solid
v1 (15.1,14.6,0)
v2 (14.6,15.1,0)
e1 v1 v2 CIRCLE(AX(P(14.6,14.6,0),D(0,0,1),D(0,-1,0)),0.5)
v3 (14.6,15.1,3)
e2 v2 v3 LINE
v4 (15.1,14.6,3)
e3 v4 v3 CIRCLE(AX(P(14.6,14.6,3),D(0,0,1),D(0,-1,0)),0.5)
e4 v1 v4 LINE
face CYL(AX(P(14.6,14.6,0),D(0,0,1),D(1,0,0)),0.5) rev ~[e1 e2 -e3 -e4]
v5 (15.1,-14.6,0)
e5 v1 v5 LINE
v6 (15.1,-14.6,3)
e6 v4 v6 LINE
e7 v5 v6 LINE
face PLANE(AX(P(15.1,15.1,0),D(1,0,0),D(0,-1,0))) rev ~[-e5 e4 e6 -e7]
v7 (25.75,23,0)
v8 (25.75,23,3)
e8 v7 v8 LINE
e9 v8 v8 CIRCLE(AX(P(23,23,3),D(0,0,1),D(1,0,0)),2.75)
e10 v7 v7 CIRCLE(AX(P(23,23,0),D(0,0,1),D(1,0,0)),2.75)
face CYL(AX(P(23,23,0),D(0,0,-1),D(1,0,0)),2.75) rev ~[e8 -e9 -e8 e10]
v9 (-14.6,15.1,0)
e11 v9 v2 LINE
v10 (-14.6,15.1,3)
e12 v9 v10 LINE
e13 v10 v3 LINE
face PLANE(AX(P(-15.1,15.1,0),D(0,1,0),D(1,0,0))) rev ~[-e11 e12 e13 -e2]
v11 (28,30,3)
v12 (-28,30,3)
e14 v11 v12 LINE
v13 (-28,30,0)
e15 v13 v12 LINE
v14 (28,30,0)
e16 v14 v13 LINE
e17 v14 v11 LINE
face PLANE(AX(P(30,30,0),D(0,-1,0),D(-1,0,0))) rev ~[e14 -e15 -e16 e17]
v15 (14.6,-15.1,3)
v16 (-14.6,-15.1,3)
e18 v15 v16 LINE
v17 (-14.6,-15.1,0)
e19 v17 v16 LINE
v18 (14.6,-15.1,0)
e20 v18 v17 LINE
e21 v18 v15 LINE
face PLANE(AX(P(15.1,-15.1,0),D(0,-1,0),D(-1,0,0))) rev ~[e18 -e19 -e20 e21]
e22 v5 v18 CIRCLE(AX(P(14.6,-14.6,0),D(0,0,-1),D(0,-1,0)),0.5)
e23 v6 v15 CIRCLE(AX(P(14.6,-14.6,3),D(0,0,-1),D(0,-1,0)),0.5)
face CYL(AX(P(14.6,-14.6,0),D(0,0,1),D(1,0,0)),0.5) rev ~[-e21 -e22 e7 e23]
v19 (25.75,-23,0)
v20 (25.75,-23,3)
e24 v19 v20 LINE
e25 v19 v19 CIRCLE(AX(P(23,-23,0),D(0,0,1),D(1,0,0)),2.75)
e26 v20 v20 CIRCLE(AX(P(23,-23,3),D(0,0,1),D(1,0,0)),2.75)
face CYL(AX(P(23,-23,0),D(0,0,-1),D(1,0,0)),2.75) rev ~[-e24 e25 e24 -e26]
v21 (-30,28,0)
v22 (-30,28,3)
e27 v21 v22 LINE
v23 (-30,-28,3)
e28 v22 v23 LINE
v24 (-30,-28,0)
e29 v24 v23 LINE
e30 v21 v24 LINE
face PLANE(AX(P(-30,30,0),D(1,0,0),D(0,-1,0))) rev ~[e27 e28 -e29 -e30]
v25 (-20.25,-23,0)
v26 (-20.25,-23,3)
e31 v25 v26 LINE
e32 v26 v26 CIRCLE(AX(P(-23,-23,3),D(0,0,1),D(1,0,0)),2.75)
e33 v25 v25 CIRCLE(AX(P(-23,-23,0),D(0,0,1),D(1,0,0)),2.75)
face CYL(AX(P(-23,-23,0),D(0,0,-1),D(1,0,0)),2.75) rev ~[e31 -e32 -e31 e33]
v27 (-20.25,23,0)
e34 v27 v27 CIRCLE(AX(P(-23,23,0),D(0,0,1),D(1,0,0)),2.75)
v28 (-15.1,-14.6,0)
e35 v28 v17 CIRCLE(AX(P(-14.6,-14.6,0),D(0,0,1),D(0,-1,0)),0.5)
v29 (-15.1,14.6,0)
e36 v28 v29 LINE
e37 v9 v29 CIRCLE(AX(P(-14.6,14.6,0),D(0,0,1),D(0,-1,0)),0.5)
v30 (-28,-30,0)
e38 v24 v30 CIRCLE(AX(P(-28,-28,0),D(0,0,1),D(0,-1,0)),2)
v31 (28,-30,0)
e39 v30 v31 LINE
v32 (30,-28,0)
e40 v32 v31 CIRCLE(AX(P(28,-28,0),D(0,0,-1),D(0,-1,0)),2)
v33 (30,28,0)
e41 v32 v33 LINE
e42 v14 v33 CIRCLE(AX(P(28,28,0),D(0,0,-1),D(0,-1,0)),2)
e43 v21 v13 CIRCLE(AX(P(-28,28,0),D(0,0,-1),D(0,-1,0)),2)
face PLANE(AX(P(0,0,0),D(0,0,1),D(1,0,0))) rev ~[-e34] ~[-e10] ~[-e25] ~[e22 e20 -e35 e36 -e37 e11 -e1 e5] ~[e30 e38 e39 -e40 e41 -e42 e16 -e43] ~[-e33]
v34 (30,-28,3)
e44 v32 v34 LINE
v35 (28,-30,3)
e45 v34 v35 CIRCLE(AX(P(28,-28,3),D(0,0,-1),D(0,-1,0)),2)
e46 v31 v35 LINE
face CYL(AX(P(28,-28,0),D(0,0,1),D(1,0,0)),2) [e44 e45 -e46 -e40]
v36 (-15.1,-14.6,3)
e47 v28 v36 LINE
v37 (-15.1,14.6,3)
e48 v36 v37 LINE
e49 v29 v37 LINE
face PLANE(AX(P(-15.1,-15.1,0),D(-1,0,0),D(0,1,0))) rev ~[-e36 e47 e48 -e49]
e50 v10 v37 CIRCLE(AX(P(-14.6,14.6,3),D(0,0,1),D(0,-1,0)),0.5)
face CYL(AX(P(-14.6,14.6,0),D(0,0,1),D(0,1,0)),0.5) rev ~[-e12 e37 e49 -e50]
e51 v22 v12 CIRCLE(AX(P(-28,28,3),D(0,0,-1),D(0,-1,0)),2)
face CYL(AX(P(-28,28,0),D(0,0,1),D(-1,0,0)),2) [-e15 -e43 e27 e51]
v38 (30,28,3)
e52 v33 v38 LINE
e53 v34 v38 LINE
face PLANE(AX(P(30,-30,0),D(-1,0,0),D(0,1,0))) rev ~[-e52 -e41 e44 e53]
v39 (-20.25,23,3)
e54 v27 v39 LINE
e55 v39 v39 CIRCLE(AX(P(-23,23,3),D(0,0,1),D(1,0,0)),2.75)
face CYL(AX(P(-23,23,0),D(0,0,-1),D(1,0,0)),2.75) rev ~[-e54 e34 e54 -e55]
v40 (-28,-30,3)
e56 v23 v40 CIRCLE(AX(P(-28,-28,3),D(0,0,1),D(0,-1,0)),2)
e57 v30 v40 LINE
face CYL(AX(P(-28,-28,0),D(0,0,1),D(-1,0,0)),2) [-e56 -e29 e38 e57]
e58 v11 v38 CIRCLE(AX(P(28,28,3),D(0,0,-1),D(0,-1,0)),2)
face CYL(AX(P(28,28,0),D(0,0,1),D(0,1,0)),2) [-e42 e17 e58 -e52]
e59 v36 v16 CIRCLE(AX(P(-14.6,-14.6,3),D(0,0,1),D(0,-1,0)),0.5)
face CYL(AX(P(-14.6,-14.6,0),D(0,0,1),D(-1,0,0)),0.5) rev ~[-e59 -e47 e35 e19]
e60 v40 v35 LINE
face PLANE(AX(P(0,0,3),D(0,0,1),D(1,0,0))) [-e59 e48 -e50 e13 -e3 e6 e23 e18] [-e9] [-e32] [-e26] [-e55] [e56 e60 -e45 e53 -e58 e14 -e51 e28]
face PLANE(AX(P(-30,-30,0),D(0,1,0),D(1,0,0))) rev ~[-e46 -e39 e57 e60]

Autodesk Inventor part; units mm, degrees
ref_plane "YZ Plane" through (0, 0, 0) normal (1, 0, 0) x (0, 1, 0)
ref_plane "XZ Plane" through (0, 0, 0) normal (0, 1, 0) x (-1, 0, 0)
ref_plane "XY Plane" through (0, 0, 0) normal (0, 0, 1) x (1, 0, 0)
sketch "Sketch1" plane through (0, 0, 0) normal (0, 0, 1) x (1, 0, 0)
  line L0 (-30, -30) -> (30, -30)
  line L1 (30, -30) -> (30, 30)
  line L2 (30, 30) -> (-30, 30)
  line L3 (-30, 30) -> (-30, -30)
  line L4 (-30, -30) -> (30, 30) construction
  line L5 (30, -30) -> (-30, 30) construction
  line L6 (15.1, -15.1) -> (-15.1, -15.1)
  line L7 (-15.1, -15.1) -> (-15.1, 15.1)
  line L8 (-15.1, 15.1) -> (15.1, 15.1)
  line L9 (15.1, 15.1) -> (15.1, -15.1)
  line L10 (15.1, -15.1) -> (-15.1, 15.1) construction
  line L11 (-15.1, -15.1) -> (15.1, 15.1) construction
  circle A0 centre (-23, -23) radius 2.75
  circle A1 centre (23, -23) radius 2.75
  circle A2 centre (23, 23) radius 2.75
  circle A3 centre (-23, 23) radius 2.75
  line L12 (25.75, 25.75) -> (-25.75, 25.75) construction
  line L13 (-25.75, 25.75) -> (-25.75, -25.75) construction
  line L14 (-25.75, -25.75) -> (25.75, -25.75) construction
  line L15 (25.75, -25.75) -> (25.75, 25.75) construction
  line L16 (25.75, 25.75) -> (-25.75, -25.75) construction
  line L17 (-25.75, 25.75) -> (25.75, -25.75) construction
  line L18 (23, 23) -> (-23, 23) construction
  line L19 (-23, 23) -> (-23, -23) construction
  line L20 (-23, -23) -> (23, -23) construction
  line L21 (23, -23) -> (23, 23) construction
  line L22 (23, 23) -> (-23, -23) construction
  line L23 (-23, 23) -> (23, -23) construction
  point P0 (0, 0)
  dimension "d172" = 30.2
  dimension "d190" = 5.5
  dimension "d191" = 46
  dimension "d192" = 60
extrude "Plate5" add sketch "Sketch1" along normal blind 3
fillet "Corner Round1" radius 2 4 edges at (30, 30, 1.5) (-30, 30, 1.5) (-30, -30, 1.5) (30, -30, 1.5)
fillet "Corner Round2" radius 0.5 4 edges at (-15.1, 15.1, 1.5) (-15.1, -15.1, 1.5) (15.1, -15.1, 1.5) (15.1, 15.1, 1.5)
properties part number "PRS 1425 DrSysB Way FLANGE_D1200" material "Stainless Steel"
